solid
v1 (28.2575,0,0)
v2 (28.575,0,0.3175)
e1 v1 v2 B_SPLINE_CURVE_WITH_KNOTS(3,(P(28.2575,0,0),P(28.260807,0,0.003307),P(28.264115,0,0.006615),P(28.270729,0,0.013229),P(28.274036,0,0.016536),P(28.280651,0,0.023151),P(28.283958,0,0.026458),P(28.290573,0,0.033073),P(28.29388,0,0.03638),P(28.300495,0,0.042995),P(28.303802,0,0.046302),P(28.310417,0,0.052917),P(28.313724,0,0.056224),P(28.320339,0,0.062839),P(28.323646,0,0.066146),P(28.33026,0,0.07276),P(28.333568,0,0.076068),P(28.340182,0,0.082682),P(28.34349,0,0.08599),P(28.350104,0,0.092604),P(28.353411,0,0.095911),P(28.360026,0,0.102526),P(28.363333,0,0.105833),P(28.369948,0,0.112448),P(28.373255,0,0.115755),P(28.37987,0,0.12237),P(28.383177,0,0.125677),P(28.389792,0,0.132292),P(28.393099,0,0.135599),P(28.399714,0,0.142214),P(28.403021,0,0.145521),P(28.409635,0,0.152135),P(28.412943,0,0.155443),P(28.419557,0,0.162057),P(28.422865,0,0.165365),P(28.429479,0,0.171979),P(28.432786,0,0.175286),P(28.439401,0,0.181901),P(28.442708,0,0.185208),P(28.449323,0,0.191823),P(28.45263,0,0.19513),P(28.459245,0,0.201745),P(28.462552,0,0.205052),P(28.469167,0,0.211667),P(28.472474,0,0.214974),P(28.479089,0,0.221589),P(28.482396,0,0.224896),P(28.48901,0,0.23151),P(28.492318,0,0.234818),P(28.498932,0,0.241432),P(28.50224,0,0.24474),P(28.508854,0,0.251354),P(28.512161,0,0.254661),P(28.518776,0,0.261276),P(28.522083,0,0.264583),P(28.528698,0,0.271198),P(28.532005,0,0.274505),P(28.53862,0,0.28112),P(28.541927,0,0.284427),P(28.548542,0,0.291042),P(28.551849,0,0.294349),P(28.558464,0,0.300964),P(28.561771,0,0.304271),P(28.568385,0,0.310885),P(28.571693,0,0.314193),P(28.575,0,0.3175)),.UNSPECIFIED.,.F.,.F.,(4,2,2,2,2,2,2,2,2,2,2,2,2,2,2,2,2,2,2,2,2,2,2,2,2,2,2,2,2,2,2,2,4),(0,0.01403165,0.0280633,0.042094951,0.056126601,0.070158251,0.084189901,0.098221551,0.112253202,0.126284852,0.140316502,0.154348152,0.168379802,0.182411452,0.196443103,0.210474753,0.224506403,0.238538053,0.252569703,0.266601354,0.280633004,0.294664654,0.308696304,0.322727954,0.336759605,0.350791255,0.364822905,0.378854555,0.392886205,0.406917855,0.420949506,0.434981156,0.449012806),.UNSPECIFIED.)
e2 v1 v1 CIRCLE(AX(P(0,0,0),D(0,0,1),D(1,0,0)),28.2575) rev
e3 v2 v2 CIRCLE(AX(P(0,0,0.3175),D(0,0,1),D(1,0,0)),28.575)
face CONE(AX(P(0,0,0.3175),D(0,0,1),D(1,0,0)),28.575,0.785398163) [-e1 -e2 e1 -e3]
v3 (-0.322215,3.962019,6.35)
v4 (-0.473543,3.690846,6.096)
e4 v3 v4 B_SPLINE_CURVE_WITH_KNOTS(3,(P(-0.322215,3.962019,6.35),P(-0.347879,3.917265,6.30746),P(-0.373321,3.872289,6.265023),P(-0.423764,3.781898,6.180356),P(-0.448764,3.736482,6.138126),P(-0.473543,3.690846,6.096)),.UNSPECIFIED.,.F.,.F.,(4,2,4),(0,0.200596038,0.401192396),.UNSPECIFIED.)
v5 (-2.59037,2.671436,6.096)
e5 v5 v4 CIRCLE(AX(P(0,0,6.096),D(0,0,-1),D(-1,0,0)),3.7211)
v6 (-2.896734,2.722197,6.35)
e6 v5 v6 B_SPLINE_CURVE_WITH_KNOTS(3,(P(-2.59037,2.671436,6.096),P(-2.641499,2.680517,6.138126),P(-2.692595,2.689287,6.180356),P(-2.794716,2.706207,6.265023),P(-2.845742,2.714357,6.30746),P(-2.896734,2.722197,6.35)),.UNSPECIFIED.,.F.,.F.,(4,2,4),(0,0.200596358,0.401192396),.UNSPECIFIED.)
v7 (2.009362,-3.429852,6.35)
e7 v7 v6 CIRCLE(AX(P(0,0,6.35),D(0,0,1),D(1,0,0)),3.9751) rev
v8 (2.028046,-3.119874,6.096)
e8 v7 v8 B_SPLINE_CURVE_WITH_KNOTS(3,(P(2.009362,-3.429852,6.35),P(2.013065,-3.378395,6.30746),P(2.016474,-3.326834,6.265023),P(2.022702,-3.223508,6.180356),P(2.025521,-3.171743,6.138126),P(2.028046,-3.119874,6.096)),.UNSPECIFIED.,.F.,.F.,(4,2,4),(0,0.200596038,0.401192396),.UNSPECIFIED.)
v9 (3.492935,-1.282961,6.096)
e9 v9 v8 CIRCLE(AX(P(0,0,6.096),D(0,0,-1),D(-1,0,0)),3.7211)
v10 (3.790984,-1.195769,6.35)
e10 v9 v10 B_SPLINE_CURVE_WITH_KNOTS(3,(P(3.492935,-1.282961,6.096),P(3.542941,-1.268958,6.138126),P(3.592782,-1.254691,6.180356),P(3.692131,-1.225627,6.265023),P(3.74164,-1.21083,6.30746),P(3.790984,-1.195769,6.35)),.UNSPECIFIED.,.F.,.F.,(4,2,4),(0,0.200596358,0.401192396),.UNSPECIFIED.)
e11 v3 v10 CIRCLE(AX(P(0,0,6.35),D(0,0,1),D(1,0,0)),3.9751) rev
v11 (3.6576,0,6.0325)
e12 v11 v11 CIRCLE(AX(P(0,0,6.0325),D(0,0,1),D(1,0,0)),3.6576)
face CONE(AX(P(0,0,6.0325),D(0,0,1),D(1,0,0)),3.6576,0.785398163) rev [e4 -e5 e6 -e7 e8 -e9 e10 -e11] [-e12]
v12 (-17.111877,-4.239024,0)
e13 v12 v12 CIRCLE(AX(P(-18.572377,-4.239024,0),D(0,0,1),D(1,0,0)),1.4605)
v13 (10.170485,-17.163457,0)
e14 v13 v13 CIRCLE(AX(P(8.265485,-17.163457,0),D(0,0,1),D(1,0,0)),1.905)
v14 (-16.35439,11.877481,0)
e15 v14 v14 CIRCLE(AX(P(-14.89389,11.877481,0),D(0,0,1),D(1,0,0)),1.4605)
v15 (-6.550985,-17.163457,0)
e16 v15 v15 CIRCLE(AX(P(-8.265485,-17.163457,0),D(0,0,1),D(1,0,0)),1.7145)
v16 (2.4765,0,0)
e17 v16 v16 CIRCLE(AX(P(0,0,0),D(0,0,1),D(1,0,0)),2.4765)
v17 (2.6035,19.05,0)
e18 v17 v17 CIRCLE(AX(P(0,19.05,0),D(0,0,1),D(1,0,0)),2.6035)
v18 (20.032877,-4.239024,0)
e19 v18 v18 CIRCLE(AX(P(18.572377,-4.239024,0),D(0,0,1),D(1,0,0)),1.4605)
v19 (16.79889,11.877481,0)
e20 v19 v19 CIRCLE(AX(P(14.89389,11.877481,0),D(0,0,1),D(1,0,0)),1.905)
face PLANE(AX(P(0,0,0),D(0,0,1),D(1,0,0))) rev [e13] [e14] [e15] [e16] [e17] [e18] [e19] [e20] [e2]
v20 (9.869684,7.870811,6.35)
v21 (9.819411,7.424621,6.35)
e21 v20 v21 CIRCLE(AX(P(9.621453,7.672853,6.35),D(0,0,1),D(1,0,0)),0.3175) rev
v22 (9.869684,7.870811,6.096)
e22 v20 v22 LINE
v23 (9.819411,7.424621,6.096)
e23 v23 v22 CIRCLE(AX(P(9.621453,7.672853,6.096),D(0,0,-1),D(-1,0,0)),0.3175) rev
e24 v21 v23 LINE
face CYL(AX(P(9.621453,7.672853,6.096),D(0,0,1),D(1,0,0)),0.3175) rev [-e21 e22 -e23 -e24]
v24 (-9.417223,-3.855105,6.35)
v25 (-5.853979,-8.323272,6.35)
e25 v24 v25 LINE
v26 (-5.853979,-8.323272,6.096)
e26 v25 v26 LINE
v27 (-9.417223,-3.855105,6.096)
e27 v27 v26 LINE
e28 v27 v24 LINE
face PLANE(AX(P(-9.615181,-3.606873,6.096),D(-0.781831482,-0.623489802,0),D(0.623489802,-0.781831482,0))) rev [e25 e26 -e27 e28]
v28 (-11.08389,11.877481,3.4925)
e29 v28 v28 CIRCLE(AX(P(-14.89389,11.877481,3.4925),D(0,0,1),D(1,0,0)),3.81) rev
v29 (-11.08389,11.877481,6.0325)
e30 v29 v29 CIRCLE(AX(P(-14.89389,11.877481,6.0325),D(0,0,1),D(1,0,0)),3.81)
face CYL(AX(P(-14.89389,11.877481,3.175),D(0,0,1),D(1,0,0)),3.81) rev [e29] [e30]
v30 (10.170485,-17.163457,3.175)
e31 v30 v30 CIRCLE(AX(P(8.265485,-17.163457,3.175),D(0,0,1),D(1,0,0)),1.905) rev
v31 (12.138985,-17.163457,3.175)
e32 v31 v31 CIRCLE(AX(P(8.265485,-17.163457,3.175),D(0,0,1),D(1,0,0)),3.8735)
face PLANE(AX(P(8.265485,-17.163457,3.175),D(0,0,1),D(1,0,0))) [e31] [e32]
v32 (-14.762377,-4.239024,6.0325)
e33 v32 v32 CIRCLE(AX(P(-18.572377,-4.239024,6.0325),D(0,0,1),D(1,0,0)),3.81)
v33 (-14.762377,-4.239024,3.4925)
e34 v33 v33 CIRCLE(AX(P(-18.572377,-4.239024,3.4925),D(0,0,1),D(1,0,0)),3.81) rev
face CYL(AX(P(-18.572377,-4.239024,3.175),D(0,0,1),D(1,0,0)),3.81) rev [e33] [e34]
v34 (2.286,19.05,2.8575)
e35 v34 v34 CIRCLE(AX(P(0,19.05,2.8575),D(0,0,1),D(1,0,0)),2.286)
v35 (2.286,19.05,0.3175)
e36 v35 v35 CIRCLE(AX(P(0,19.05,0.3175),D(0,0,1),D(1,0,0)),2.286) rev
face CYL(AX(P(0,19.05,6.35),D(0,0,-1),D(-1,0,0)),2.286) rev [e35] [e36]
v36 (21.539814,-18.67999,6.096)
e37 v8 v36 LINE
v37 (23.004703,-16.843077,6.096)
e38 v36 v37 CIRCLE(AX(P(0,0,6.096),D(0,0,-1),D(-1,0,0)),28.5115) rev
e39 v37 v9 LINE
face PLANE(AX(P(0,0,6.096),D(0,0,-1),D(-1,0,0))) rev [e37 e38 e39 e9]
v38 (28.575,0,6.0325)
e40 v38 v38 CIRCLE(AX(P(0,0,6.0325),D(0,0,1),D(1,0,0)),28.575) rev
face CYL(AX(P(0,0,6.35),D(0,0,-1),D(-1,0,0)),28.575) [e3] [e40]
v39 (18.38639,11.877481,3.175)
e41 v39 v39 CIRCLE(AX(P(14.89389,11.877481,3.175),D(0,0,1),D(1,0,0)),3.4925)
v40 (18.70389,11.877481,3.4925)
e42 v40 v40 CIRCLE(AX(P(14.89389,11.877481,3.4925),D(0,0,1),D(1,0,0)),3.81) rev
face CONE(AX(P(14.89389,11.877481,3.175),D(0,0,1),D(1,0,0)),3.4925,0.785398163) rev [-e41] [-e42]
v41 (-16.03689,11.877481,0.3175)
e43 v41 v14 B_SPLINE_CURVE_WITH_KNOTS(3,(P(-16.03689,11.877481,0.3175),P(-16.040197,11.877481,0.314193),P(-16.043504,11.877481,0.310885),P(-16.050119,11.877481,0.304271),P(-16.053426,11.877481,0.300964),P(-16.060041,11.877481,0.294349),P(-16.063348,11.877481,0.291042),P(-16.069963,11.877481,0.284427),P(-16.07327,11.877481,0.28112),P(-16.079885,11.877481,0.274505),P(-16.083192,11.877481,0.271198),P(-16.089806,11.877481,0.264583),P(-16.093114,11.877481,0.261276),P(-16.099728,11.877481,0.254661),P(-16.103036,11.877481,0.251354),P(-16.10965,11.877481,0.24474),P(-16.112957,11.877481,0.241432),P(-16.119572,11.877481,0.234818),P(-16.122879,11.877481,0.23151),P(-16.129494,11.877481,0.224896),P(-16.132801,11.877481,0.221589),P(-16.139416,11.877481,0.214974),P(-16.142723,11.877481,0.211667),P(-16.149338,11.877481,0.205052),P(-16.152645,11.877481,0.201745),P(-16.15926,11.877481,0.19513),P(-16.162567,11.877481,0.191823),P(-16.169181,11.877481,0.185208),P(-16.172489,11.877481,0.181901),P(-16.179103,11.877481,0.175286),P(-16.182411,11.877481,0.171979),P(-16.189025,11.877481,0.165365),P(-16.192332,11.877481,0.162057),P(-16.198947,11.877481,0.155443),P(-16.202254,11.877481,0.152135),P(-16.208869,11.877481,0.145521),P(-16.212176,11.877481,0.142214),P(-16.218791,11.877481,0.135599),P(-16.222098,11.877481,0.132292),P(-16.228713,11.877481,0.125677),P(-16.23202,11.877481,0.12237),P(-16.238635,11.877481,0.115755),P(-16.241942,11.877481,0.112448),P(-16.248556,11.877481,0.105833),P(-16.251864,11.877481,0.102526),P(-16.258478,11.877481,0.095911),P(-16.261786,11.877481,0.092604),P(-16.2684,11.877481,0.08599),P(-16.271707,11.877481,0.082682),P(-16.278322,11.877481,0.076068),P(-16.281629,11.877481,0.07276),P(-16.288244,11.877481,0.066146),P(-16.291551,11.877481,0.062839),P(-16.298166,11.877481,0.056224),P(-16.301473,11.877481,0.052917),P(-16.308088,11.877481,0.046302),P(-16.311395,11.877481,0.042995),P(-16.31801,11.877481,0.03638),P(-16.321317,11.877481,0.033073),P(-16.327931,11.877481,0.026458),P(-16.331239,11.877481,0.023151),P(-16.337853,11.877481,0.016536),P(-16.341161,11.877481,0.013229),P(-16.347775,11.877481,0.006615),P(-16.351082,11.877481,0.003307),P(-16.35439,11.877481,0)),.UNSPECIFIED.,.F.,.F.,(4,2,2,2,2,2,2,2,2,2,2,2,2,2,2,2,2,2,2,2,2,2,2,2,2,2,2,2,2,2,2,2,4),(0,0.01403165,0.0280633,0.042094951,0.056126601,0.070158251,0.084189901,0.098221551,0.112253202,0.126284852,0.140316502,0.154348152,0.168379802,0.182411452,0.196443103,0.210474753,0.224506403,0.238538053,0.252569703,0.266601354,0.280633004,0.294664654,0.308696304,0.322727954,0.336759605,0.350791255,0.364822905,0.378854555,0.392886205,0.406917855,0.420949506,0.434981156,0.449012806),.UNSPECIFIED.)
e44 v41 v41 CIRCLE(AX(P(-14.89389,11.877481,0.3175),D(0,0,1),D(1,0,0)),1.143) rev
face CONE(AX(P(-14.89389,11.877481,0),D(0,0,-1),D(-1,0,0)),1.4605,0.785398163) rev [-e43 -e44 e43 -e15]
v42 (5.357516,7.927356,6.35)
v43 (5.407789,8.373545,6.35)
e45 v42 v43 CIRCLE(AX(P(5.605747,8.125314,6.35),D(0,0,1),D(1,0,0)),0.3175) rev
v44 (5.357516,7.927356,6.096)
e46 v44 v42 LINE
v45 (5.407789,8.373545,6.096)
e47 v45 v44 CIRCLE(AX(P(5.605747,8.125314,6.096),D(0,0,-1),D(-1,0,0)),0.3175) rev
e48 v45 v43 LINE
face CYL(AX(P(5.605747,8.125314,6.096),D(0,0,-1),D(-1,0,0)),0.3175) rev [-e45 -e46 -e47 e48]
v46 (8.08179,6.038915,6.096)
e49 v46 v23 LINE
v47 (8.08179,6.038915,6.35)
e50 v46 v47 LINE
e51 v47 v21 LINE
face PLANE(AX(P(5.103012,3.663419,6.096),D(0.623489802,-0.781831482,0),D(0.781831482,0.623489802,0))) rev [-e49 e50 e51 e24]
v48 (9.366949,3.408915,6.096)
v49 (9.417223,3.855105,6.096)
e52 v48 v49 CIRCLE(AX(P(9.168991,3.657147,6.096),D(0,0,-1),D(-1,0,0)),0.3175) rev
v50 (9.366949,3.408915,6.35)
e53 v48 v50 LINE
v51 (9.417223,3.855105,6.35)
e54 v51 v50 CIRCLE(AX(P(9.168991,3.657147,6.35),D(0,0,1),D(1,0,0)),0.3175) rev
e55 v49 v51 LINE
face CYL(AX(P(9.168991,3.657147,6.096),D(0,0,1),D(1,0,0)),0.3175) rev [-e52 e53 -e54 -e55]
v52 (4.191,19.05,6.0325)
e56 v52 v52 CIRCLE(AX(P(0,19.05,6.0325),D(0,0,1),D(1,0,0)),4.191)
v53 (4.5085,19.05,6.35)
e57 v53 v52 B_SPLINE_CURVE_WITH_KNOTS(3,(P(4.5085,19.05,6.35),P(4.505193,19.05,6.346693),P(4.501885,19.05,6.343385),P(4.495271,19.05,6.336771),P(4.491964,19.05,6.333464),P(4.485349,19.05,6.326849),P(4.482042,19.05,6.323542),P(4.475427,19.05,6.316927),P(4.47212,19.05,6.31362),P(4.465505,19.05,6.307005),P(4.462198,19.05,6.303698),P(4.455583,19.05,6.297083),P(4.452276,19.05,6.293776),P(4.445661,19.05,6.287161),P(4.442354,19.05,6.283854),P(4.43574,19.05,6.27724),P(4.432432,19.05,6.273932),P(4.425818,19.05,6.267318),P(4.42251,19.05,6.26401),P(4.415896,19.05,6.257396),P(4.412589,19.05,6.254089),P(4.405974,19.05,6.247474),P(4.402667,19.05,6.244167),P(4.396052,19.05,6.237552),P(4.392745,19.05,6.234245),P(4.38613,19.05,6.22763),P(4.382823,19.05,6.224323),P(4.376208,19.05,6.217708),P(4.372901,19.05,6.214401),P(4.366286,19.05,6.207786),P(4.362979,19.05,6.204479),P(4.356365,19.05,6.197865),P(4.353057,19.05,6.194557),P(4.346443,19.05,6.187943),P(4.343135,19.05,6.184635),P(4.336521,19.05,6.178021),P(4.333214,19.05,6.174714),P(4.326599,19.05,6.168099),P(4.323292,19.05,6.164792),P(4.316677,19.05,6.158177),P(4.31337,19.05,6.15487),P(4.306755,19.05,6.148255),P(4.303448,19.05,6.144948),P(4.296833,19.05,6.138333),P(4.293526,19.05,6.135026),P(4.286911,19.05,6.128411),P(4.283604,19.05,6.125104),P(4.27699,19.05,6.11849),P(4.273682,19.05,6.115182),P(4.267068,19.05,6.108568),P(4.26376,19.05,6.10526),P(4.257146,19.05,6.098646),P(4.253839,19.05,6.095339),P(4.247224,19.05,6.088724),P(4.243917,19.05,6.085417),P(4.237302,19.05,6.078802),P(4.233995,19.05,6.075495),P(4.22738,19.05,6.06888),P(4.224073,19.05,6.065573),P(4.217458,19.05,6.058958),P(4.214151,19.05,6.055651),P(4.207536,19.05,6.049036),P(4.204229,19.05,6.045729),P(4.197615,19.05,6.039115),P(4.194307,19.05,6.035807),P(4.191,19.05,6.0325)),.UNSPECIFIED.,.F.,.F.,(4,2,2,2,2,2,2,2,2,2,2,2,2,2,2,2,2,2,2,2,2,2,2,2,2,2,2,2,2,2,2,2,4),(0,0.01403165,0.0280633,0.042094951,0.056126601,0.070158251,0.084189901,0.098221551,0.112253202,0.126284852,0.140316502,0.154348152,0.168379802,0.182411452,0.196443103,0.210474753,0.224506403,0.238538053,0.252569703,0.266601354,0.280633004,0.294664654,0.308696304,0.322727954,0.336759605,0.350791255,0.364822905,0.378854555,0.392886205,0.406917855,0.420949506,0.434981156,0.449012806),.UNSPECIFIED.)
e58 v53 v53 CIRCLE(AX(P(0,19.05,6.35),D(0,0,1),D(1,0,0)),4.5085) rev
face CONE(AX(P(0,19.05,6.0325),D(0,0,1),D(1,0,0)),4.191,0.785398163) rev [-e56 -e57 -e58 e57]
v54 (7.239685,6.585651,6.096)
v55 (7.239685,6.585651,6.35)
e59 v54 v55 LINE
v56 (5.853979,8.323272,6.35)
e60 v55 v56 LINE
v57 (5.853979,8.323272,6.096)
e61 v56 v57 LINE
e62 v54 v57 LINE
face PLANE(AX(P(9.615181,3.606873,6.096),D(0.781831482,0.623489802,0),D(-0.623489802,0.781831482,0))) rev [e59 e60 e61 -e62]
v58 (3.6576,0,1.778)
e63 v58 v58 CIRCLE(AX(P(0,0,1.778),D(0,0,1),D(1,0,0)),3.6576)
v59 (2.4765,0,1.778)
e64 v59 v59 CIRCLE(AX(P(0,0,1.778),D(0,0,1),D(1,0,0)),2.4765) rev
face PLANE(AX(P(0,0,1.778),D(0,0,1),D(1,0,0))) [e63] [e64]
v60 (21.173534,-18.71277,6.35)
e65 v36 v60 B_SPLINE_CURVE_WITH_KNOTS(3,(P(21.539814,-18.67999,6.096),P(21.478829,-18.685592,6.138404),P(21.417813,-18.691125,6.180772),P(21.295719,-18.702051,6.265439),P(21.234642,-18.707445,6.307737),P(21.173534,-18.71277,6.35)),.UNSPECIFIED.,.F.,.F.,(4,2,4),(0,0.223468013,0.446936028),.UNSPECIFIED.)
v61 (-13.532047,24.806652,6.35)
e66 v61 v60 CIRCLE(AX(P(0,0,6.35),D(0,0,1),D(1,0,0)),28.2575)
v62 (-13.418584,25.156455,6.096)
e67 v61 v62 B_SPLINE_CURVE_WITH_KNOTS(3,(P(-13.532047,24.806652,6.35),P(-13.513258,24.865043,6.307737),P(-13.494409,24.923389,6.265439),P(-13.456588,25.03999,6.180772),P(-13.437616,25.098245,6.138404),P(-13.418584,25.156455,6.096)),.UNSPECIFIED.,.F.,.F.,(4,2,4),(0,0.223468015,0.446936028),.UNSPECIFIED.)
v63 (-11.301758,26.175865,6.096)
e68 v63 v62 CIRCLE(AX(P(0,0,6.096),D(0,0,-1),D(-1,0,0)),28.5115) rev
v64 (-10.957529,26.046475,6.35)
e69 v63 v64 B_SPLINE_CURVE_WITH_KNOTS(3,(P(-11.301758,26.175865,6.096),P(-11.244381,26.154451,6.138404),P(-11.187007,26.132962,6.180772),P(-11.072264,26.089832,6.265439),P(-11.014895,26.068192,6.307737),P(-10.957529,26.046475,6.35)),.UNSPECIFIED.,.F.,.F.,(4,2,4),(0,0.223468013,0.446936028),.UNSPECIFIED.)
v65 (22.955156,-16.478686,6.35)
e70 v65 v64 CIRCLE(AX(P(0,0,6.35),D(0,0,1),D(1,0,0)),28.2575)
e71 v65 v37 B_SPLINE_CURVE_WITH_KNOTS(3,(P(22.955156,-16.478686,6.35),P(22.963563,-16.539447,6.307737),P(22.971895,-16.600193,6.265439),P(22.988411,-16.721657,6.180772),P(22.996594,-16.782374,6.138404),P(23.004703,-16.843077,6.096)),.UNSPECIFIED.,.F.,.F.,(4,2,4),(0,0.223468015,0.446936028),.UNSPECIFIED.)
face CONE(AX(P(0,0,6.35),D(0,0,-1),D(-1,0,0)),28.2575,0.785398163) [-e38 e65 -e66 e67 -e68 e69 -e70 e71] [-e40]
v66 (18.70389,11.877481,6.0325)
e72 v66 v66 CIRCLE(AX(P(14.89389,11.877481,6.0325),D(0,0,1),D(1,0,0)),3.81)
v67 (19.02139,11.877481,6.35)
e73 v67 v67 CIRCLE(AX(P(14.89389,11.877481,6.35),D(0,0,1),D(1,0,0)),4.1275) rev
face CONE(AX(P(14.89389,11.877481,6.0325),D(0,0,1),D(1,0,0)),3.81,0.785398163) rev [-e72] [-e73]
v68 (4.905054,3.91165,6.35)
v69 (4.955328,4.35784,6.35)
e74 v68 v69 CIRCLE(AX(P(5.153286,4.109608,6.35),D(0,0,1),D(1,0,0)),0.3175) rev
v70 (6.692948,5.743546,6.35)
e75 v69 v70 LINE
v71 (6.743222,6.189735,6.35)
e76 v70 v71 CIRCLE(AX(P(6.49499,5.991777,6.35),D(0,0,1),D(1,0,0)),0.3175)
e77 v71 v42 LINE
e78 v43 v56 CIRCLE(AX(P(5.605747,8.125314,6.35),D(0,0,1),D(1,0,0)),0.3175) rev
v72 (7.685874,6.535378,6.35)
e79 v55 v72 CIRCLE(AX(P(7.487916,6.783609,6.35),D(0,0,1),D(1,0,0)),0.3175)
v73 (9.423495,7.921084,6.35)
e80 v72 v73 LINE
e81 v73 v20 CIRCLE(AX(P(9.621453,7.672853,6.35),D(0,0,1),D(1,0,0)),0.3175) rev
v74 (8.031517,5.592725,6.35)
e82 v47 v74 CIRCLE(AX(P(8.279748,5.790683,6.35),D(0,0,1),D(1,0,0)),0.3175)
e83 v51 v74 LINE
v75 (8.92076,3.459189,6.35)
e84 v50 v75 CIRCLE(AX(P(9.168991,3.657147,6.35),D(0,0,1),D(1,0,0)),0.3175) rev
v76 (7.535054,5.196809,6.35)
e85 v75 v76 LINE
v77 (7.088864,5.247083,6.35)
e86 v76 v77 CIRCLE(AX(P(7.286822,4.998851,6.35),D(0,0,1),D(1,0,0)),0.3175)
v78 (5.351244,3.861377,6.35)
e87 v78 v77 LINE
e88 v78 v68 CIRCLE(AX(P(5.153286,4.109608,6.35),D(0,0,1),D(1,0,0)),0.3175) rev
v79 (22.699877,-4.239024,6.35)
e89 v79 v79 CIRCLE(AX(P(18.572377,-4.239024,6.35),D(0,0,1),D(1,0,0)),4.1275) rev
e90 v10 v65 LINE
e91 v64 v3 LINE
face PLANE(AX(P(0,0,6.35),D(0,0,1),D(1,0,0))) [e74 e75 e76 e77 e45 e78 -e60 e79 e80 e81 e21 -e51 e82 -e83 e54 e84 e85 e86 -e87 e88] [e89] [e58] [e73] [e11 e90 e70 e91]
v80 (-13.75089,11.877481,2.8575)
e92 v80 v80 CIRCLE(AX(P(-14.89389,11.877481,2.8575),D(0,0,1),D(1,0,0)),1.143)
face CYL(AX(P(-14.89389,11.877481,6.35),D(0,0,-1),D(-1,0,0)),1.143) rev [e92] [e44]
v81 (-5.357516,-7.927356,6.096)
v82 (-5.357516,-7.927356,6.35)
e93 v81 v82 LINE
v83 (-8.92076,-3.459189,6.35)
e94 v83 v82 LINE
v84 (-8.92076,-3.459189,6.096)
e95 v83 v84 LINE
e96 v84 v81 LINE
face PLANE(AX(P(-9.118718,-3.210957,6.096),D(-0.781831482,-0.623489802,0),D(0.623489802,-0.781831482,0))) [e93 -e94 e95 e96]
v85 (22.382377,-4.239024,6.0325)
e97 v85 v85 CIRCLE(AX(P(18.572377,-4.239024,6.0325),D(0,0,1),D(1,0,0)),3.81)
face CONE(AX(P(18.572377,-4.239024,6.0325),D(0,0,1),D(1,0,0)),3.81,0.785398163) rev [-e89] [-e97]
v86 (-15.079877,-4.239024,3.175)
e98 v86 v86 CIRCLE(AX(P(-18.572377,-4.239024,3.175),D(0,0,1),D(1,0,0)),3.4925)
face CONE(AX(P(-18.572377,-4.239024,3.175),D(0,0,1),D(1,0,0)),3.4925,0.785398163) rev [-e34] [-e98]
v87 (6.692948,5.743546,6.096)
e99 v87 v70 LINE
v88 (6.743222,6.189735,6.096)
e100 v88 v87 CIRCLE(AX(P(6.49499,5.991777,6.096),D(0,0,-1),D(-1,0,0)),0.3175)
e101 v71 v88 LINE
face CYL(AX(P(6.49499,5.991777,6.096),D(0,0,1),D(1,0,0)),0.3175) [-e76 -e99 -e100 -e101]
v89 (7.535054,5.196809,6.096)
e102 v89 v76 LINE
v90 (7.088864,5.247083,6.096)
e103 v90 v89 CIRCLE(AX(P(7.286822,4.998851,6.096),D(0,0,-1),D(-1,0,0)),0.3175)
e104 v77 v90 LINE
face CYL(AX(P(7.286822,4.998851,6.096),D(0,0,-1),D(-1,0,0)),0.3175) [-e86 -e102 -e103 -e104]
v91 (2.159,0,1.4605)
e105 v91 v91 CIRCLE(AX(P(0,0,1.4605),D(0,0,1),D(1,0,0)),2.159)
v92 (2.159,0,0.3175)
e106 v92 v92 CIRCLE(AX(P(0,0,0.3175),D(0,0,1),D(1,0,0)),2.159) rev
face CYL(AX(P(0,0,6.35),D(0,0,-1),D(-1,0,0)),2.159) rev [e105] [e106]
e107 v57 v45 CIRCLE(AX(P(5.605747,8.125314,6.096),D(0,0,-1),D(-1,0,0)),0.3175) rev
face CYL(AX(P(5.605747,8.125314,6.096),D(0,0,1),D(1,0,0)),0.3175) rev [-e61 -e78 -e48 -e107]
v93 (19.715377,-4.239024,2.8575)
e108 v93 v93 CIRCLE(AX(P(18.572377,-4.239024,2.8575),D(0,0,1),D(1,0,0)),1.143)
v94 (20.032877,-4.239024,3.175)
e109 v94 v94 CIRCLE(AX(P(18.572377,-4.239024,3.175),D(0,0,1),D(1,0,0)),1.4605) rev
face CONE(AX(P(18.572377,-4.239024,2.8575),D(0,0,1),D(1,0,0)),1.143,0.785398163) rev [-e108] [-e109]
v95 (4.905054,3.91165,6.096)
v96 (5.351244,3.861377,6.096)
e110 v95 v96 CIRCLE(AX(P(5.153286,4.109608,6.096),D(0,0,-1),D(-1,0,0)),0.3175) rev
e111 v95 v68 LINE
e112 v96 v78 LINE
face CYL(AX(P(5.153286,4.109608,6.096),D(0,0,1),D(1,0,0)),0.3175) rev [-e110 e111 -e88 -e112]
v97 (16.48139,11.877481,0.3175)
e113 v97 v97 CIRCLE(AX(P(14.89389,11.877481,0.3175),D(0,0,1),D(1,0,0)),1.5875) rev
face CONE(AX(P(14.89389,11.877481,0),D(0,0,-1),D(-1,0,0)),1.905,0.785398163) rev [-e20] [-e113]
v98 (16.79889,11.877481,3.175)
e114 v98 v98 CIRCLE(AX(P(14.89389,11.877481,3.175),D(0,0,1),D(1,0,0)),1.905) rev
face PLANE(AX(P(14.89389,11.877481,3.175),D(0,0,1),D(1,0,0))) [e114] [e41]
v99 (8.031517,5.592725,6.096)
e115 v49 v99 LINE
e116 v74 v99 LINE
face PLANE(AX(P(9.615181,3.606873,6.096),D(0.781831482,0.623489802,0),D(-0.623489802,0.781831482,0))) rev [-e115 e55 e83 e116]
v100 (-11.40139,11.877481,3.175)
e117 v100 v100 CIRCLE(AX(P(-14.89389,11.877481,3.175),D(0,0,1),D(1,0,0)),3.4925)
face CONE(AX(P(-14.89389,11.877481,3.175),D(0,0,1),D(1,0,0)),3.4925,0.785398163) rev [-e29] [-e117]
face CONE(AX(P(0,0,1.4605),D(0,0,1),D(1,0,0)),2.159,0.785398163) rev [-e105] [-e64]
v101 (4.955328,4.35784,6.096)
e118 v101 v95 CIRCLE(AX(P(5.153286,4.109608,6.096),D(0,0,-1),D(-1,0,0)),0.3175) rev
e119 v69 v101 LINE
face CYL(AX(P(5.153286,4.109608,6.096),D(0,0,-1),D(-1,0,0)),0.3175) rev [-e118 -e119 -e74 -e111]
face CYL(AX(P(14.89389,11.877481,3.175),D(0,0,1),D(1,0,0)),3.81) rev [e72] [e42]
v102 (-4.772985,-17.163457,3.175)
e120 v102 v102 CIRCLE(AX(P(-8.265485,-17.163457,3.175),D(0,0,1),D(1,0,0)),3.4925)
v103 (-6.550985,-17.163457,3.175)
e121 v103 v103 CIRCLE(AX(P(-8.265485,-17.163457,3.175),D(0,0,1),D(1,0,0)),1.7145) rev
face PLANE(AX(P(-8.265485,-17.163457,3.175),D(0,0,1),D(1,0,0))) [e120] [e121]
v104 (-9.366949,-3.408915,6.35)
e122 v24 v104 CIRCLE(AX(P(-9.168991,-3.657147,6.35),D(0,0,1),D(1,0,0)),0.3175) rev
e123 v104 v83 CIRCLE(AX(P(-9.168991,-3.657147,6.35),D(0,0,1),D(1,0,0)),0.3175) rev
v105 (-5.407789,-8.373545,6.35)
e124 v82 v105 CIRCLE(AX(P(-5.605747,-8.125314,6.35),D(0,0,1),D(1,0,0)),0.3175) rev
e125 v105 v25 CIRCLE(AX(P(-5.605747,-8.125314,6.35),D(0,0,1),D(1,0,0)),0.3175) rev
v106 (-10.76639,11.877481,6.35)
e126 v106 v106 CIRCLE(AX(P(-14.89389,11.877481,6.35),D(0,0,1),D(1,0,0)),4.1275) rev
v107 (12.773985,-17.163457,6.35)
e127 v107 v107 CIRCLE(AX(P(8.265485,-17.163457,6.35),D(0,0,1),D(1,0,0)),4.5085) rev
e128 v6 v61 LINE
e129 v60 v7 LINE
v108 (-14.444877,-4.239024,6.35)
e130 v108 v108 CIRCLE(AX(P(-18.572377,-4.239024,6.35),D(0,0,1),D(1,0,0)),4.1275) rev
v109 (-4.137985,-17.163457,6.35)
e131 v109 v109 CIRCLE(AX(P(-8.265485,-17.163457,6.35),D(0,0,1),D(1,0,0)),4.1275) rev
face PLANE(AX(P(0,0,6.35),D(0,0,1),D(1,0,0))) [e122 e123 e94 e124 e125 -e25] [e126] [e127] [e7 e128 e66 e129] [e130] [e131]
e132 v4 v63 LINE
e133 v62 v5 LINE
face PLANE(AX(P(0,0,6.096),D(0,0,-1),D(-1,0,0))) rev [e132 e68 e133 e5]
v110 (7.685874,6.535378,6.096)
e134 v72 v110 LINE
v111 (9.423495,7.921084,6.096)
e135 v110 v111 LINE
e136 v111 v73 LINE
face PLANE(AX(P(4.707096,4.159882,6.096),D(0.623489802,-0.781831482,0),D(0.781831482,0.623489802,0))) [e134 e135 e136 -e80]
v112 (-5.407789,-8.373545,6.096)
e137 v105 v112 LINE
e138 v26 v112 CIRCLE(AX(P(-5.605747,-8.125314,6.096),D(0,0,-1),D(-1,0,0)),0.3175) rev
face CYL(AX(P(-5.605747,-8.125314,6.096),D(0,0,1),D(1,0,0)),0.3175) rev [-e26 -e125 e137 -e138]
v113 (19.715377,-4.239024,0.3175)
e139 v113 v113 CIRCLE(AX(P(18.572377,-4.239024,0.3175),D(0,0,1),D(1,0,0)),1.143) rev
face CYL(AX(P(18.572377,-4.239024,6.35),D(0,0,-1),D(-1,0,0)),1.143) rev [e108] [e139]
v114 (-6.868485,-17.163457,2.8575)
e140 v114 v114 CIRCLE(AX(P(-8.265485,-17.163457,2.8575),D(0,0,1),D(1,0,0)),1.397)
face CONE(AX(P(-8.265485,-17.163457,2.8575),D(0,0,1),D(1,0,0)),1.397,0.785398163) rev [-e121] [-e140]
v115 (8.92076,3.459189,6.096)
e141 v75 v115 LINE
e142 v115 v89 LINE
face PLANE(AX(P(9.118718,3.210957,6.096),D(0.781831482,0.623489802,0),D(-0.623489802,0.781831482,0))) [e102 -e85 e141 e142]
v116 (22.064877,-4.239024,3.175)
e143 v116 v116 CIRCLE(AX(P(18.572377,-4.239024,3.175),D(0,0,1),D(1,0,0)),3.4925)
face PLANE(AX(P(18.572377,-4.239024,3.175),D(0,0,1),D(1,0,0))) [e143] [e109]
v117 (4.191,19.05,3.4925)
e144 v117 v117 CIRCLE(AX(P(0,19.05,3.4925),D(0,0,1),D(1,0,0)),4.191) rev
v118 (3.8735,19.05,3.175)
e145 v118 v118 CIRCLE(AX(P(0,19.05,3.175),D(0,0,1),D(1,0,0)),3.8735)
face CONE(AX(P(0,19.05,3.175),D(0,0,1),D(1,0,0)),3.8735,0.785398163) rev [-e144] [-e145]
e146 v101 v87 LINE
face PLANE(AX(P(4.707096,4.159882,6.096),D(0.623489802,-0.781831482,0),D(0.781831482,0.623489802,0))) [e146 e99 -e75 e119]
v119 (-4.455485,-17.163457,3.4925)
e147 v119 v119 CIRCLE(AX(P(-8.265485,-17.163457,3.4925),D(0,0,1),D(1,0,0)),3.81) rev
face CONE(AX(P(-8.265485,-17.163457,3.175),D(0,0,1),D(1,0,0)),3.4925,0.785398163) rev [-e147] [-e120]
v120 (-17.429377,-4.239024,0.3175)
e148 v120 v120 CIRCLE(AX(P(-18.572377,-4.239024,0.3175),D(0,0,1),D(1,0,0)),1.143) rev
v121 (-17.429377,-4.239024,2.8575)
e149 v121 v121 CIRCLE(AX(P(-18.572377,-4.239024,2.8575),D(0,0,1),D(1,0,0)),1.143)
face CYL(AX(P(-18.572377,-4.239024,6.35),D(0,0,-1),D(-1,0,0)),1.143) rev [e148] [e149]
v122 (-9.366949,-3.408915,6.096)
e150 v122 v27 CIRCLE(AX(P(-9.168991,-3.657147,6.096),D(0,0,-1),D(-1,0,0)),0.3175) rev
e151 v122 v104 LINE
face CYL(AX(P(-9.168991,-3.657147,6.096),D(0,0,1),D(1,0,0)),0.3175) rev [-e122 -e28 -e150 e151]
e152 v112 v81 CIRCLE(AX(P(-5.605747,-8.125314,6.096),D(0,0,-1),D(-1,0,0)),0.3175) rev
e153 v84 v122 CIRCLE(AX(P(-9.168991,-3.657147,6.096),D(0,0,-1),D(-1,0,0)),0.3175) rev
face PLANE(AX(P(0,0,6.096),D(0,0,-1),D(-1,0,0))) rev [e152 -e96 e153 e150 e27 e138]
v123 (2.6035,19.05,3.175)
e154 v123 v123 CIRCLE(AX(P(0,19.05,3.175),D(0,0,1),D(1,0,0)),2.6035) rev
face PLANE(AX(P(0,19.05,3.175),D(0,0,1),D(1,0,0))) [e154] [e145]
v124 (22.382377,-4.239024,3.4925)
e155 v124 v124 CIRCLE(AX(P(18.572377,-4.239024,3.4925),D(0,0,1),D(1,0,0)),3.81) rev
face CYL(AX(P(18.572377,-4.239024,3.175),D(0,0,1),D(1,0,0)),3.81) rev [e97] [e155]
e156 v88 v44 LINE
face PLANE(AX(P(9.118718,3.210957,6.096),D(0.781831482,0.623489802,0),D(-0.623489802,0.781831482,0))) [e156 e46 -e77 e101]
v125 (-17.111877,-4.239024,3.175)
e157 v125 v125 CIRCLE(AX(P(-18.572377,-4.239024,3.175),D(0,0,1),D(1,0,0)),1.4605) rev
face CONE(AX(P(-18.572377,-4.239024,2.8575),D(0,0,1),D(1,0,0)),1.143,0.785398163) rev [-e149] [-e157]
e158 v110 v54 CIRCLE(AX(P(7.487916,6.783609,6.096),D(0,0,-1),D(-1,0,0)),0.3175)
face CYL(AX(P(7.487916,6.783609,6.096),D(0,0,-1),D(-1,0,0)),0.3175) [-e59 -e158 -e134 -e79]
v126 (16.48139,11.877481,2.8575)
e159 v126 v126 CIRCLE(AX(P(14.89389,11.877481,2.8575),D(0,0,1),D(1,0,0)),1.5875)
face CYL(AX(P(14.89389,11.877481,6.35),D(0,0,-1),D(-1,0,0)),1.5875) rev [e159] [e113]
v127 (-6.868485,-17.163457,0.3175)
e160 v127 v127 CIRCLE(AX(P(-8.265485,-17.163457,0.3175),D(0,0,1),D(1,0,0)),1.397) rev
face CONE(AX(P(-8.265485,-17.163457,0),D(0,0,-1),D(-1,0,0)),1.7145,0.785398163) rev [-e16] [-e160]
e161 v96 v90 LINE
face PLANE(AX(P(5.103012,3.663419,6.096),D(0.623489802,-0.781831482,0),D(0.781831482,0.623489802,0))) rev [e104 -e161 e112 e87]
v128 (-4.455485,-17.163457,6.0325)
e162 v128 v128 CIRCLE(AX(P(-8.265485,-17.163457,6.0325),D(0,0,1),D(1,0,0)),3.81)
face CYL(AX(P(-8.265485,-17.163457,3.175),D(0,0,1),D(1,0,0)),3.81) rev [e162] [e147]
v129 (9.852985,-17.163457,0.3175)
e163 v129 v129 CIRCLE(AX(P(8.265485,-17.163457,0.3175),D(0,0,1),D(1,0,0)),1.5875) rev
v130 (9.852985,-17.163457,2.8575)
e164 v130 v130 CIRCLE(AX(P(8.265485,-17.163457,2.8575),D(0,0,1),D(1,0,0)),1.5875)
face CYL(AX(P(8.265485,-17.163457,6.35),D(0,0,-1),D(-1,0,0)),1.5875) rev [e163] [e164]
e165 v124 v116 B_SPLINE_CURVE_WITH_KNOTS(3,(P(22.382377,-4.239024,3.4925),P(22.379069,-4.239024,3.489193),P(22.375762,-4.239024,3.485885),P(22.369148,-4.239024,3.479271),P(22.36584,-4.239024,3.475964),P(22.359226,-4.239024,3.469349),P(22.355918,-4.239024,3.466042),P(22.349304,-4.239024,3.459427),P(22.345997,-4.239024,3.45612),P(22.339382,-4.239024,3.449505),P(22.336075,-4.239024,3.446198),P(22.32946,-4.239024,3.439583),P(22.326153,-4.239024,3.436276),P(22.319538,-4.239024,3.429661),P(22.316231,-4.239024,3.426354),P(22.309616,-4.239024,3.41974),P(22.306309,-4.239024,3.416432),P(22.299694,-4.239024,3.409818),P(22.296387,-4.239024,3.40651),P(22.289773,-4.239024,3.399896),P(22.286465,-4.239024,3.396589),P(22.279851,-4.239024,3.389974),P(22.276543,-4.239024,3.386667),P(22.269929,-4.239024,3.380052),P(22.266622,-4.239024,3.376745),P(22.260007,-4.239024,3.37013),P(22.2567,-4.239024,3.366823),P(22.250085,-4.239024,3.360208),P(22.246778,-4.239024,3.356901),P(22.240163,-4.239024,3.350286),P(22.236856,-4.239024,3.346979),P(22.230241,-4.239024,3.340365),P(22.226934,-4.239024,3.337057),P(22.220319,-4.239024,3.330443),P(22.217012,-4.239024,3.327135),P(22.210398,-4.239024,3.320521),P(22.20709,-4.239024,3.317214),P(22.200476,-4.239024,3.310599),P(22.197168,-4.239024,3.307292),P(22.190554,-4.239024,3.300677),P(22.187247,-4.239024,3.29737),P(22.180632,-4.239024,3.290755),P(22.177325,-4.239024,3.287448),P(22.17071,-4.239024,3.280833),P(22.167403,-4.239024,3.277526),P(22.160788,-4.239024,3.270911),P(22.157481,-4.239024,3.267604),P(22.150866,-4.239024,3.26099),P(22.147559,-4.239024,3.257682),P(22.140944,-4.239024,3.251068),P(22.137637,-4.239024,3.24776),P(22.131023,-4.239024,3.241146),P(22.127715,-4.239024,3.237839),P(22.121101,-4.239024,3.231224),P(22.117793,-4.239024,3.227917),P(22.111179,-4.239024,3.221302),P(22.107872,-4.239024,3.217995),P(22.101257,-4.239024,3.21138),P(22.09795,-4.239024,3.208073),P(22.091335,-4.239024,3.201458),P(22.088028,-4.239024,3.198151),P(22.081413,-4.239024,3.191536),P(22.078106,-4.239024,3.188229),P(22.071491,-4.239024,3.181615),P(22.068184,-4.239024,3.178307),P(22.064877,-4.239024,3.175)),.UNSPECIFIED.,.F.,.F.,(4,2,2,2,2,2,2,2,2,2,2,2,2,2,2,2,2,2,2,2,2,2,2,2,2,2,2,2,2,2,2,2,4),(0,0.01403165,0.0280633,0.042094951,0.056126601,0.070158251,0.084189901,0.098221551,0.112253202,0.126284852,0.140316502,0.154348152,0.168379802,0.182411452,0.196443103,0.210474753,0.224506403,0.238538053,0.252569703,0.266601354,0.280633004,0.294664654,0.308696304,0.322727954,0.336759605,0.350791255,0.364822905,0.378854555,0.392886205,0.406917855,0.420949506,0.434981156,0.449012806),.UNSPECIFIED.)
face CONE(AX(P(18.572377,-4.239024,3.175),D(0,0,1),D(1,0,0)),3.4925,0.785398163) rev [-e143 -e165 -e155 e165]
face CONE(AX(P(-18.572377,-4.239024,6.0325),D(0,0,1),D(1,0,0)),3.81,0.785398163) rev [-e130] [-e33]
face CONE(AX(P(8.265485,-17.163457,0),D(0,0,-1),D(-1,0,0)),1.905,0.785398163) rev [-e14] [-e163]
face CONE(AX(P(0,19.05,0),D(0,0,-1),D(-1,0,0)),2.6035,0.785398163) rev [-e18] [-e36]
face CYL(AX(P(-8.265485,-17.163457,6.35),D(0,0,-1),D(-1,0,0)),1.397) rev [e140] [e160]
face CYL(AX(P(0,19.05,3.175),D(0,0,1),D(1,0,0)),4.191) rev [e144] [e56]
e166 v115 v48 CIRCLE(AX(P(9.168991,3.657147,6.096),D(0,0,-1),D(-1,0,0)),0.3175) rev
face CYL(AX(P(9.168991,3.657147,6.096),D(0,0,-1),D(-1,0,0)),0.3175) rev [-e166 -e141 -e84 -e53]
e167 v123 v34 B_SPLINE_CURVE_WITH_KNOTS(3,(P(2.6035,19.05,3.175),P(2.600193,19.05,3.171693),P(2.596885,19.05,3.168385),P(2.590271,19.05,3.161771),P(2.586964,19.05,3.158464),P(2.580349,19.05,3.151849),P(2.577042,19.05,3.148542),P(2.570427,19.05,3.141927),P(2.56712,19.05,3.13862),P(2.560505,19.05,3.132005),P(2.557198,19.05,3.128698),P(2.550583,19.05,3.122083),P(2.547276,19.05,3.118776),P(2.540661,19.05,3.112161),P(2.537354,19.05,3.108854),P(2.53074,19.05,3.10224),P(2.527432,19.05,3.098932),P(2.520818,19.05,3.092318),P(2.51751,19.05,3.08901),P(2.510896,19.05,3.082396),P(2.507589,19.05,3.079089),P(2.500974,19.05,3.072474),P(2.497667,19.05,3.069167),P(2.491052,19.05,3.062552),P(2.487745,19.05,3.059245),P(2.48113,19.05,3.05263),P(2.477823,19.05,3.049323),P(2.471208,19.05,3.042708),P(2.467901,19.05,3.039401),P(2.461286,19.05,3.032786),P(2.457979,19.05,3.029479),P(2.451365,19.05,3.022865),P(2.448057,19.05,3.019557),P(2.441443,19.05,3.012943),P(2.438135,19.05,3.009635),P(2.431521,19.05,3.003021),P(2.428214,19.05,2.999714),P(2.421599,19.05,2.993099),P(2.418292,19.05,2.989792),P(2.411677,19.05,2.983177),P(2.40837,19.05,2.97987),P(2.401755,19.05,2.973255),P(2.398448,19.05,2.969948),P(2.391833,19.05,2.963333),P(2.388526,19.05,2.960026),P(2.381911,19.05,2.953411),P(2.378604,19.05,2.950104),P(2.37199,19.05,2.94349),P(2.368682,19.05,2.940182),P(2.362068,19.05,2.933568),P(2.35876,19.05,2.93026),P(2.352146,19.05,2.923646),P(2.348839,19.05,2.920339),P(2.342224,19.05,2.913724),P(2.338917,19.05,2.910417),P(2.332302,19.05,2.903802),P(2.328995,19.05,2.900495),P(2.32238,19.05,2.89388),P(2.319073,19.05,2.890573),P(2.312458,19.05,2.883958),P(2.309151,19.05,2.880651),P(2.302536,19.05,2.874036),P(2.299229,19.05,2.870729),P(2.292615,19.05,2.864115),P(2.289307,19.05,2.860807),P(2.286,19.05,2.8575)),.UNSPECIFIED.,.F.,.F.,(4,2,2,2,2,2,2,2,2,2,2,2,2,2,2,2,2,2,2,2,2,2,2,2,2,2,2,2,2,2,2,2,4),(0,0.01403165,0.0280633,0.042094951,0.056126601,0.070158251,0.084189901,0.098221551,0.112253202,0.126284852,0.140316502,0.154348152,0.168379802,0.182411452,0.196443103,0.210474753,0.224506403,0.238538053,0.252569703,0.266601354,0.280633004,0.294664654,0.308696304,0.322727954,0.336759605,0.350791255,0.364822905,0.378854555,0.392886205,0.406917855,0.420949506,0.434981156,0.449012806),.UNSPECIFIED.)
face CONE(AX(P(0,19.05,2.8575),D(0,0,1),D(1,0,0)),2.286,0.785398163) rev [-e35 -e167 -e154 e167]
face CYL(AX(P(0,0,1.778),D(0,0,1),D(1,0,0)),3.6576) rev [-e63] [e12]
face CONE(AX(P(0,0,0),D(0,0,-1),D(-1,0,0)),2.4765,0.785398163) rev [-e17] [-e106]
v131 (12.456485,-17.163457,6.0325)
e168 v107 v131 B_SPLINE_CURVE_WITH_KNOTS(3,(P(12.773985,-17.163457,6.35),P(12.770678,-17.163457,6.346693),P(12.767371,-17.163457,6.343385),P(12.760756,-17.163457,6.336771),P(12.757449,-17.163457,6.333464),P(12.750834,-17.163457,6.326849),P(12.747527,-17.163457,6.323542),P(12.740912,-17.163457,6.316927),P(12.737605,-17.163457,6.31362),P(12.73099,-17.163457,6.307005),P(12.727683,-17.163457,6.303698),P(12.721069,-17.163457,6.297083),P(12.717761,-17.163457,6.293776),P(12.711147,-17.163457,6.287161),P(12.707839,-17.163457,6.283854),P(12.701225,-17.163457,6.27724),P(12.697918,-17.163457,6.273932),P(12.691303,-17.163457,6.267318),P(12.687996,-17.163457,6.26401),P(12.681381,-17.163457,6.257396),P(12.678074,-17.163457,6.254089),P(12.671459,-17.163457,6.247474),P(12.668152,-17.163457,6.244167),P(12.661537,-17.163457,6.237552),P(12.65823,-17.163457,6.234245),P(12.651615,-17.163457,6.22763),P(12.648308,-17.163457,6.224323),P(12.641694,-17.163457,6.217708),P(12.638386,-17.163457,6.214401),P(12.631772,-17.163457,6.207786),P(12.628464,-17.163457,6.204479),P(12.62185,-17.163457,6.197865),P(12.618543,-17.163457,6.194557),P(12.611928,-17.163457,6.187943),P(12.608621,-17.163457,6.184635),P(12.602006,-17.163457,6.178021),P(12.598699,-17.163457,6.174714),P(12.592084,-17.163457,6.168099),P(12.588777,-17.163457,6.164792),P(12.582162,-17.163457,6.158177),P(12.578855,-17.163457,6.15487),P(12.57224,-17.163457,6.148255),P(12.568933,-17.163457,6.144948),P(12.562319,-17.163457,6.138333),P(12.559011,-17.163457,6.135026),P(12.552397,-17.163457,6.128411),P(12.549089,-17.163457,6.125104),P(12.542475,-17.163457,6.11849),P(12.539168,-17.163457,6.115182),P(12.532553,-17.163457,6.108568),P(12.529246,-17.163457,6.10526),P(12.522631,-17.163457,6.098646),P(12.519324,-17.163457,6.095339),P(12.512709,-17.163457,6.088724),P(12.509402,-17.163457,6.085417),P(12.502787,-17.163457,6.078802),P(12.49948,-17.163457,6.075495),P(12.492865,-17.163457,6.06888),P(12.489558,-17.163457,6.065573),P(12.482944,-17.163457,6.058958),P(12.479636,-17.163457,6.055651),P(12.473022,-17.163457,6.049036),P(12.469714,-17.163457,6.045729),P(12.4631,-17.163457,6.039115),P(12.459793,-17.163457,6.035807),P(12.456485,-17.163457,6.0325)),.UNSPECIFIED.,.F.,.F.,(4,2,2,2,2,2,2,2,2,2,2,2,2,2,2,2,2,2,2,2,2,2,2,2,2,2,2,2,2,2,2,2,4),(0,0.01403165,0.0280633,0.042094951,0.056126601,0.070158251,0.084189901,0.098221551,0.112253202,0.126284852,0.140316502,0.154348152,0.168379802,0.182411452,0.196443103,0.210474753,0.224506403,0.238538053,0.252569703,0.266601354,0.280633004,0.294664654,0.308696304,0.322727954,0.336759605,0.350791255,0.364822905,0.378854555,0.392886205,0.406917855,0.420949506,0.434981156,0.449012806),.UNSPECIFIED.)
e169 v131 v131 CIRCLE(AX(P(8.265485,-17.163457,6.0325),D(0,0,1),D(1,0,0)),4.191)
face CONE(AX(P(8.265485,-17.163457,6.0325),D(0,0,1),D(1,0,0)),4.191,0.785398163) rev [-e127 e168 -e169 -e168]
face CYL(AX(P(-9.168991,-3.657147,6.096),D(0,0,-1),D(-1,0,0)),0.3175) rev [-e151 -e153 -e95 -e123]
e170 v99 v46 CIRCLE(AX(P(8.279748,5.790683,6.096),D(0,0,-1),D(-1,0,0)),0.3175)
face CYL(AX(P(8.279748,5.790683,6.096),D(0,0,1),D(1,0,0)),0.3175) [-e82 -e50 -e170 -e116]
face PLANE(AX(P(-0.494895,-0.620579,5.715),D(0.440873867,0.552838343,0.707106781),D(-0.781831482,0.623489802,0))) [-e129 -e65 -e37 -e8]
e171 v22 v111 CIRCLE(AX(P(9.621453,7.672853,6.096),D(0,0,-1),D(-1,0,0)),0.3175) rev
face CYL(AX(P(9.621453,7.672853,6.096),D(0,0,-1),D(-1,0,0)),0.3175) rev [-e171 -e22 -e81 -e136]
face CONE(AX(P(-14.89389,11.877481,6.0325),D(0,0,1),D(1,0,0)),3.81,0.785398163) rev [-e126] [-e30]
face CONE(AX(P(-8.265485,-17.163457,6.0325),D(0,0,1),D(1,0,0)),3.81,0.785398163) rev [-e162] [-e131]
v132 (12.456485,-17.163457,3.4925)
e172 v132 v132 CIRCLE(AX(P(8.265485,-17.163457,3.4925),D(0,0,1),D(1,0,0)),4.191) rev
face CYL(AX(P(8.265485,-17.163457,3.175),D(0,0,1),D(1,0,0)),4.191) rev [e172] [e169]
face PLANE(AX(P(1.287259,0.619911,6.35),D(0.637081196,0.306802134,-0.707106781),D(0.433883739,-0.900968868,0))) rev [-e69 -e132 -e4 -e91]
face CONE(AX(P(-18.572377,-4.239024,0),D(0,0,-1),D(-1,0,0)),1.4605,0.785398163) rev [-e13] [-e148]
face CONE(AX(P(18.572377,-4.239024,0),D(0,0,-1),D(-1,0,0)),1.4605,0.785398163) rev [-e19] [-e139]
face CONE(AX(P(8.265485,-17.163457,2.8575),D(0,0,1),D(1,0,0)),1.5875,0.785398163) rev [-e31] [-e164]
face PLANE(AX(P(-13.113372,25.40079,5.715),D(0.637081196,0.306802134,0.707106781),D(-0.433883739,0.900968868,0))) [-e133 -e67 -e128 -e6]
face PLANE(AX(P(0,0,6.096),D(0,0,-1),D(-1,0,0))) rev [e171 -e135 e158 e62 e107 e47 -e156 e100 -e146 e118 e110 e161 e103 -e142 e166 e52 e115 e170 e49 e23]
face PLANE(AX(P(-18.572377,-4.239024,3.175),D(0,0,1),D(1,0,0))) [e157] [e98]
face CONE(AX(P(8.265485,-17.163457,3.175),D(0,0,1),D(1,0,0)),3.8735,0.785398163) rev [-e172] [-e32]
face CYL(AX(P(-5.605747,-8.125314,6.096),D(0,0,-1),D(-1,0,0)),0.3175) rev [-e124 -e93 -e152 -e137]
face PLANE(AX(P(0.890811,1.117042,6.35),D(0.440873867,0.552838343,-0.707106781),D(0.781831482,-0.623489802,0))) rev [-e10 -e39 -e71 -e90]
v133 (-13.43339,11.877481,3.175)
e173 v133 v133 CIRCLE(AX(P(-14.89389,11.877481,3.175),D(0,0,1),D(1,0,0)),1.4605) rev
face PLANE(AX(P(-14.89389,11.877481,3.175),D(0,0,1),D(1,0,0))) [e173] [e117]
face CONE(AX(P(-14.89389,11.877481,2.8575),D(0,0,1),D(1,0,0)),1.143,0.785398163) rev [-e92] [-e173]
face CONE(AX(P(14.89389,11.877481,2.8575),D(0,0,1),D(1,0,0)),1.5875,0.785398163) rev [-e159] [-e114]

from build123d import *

# Parameters (mm, degrees)
SKETCH1_R               = 28.575
SKETCH1_R_2             = 2.286
SKETCH1_R_3             = 1.5875
SKETCH1_R_4             = 1.143
SKETCH1_R_5             = 1.397
SKETCH1_R_6             = 2.159
BOSS_EXTRUDE1_DEPTH     = 6.35
SKETCH2_R               = 4.191
SKETCH2_R_2             = 3.81
CUT_EXTRUDE1_DEPTH      = 3.175
SKETCH3_R               = 3.6576
CUT_EXTRUDE2_DEPTH      = 4.572
CHAMFER1_SIZE           = 0.3175
CUT_EXTRUDE_THIN2_DEPTH = 0.254
FILLET1_R               = 0.3175
CUT_EXTRUDE_THIN1_DEPTH = 0.254
CHAMFER2_SIZE           = 0.635


# Some blends are built 0.0001 mm under size
with BuildPart() as part:
    # Sketch1 → Boss-Extrude1 (new body)
    with BuildSketch(Plane.XY):
        Circle(SKETCH1_R)
        with Locations((0, 19.05)):
            Circle(SKETCH1_R_2, mode=Mode.SUBTRACT)
        with Locations((14.893889741, 11.877480725)):
            Circle(SKETCH1_R_3, mode=Mode.SUBTRACT)
        with Locations((18.572376727, -4.239023792)):
            Circle(SKETCH1_R_4, mode=Mode.SUBTRACT)
        with Locations((8.26548523, -17.163456934)):
            Circle(SKETCH1_R_3, mode=Mode.SUBTRACT)
        with Locations((-8.26548523, -17.163456934)):
            Circle(SKETCH1_R_5, mode=Mode.SUBTRACT)
        with Locations((-18.572376727, -4.239023792)):
            Circle(SKETCH1_R_4, mode=Mode.SUBTRACT)
        with Locations((-14.893889741, 11.877480725)):
            Circle(SKETCH1_R_4, mode=Mode.SUBTRACT)
        Circle(SKETCH1_R_6, mode=Mode.SUBTRACT)
    extrude(amount=BOSS_EXTRUDE1_DEPTH)

    # Sketch2 → Cut-Extrude1 (cut)
    with BuildSketch(Plane.XY.offset(6.35)):
        with Locations((0, 19.05)):
            Circle(SKETCH2_R)
        with Locations((14.893889741, 11.877480725)):
            Circle(SKETCH2_R_2)
        with Locations((18.572376727, -4.239023792)):
            Circle(SKETCH2_R_2)
        with Locations((8.26548523, -17.163456934)):
            Circle(SKETCH2_R)
        with Locations((-8.26548523, -17.163456934)):
            Circle(SKETCH2_R_2)
        with Locations((-18.572376727, -4.239023792)):
            Circle(SKETCH2_R_2)
        with Locations((-14.893889741, 11.877480725)):
            Circle(SKETCH2_R_2)
    extrude(amount=-CUT_EXTRUDE1_DEPTH, mode=Mode.SUBTRACT)

    # Sketch3 → Cut-Extrude2 (cut)
    with BuildSketch(Plane.XY.offset(6.35)):
        Circle(SKETCH3_R)
    extrude(amount=-CUT_EXTRUDE2_DEPTH, mode=Mode.SUBTRACT)

    # Chamfer1
    chamfer1_edges = [part.edges().sort_by_distance(p)[0] for p in [
        (17.429376727, -4.239023792, 0),
        (6.67798523, -17.163456934, 0),
        (-28.575, 0, 0),
        (-9.66248523, -17.163456934, 0),
        (-19.715376727, -4.239023792, 0),
        (-16.036889741, 11.877480725, 0),
        (-2.159, 0, 0),
        (-28.575, 0, 6.35),
        (11.083889741, 11.877480725, 3.175),
        (13.306389741, 11.877480725, 3.175),
        (11.083889741, 11.877480725, 6.35),
        (13.306389741, 11.877480725, 0),
        (14.762376727, -4.239023792, 3.175),
        (17.429376727, -4.239023792, 3.175),
        (14.762376727, -4.239023792, 6.35),
        (4.07448523, -17.163456934, 3.175),
        (6.67798523, -17.163456934, 3.175),
        (4.07448523, -17.163456934, 6.35),
        (-12.07548523, -17.163456934, 3.175),
        (-9.66248523, -17.163456934, 3.175),
        (-12.07548523, -17.163456934, 6.35),
        (-22.382376727, -4.239023792, 3.175),
        (-19.715376727, -4.239023792, 3.175),
        (-22.382376727, -4.239023792, 6.35),
        (-18.703889741, 11.877480725, 3.175),
        (-16.036889741, 11.877480725, 3.175),
        (-18.703889741, 11.877480725, 6.35),
        (-4.191, 19.05, 3.175),
        (-2.286, 19.05, 3.175),
        (-4.191, 19.05, 6.35),
        (-2.159, 0, 1.778),
        (-3.6576, 0, 6.35),
        (-2.286, 19.05, 0),
    ]]
    chamfer(chamfer1_edges, length=CHAMFER1_SIZE)

    # Sketch5 → Cut-Extrude-Thin2 (cut)
    with BuildSketch(Plane.XY.offset(6.35)):
        Polygon((5.103012367, 3.663418823), (10.06764228, 7.622579065), (9.671726256, 8.119042056), (4.707096343, 4.159881815), align=None)
        Polygon((9.615180928, 3.606873495), (5.656020686, 8.571503409), (5.159557695, 8.175587385), (9.118717937, 3.210957471), align=None)
        Polygon((-9.615180928, -3.606873495), (-5.656020686, -8.571503409), (-5.159557695, -8.175587385), (-9.118717937, -3.210957471), align=None)
    extrude(amount=-CUT_EXTRUDE_THIN2_DEPTH, mode=Mode.SUBTRACT)

    # Fillet1
    fillet1_edges = [part.edges().sort_by_distance(p)[0] for p in [
        (-5.656020686, -8.571503409, 6.223),
        (-9.615180928, -3.606873495, 6.223),
        (-9.118717937, -3.210957471, 6.223),
        (-5.159557695, -8.175587385, 6.223),
        (10.06764228, 7.622579065, 6.223),
        (9.615180928, 3.606873495, 6.223),
        (9.118717937, 3.210957471, 6.223),
        (5.103012367, 3.663418823, 6.223),
        (4.707096343, 4.159881815, 6.223),
        (5.159557695, 8.175587385, 6.223),
        (9.671726256, 8.119042056, 6.223),
        (5.656020686, 8.571503409, 6.223),
        (7.337095828, 5.445040932, 6.223),
        (7.833558819, 5.840956956, 6.223),
        (7.437642795, 6.337419948, 6.223),
        (6.941179804, 5.941503923, 6.223),
    ]]
    fillet(fillet1_edges, radius=FILLET1_R - 0.0001)  # a hair under: the kernel refuses the full size

    # Sketch4 → Cut-Extrude-Thin1 (cut)
    with BuildSketch(Plane.XY.offset(6.35)):
        Polygon((-13.113371884, 25.400790182), (-0.636538078, -0.507622178), (21.845939581, -18.436799827), (22.835729642, -17.195642349), (0.636538078, 0.507622178), (-11.683083806, 26.089580618), align=None)
    extrude(amount=-CUT_EXTRUDE_THIN1_DEPTH, mode=Mode.SUBTRACT)

    # Chamfer2
    # the kernel refuses this chamfer: 0.635 mm, written as the material it takes off along each edge
    with BuildSketch(Plane(origin=(1.273628889, -2.030929502, 6.35), x_dir=(-0.6232540709086805, -0.7815358852062859, 0.027495876610585914), z_dir=(0.7818314824680229, -0.6234898018587423, 0))) as chamfer2_piece_1_section:
        Polygon((CHAMFER2_SIZE * 0.999621916911, CHAMFER2_SIZE * 0.0274958766106), (-CHAMFER2_SIZE * 0.0274958766106, CHAMFER2_SIZE * 0.999621916911), (0, 0), align=None)
    chamfer2_piece_1 = extrude(amount=27.617341328, mode=Mode.PRIVATE)
    chamfer2_piece_1 = split(chamfer2_piece_1, bisect_by=Plane(origin=(11.905816468, -10.845976149, 6.096), z_dir=(0, 0, 1)), keep=Keep.TOP, mode=Mode.PRIVATE)
    add(chamfer2_piece_1, mode=Mode.SUBTRACT)
    with BuildSketch(Plane(origin=(23.855525862, -18.008902696, 6.35), x_dir=(0.6232540709086805, 0.7815358852062859, 0.027495876610585834), z_dir=(-0.7818314824680228, 0.6234898018587423, 0))) as chamfer2_piece_2_section:
        Polygon((CHAMFER2_SIZE * 0.999621916911, CHAMFER2_SIZE * 0.0274958766106), (-CHAMFER2_SIZE * 0.0274958766106, CHAMFER2_SIZE * 0.999621916911), (0, 0), align=None)
    chamfer2_piece_2 = extrude(amount=27.617341328, mode=Mode.PRIVATE)
    chamfer2_piece_2 = split(chamfer2_piece_2, bisect_by=Plane(origin=(13.223338283, -9.193856049, 6.096), z_dir=(0, 0, 1)), keep=Keep.TOP, mode=Mode.PRIVATE)
    add(chamfer2_piece_2, mode=Mode.SUBTRACT)
    with BuildSketch(Plane(origin=(-0.266312692, 2.382411119, 6.35), x_dir=(0.9006282268100128, 0.4337196950133434, 0.02749587661058592), z_dir=(-0.43388373911756706, 0.9009688679024148, 0))) as chamfer2_piece_3_section:
        Polygon((CHAMFER2_SIZE * 0.999621916911, CHAMFER2_SIZE * 0.0274958766106), (-CHAMFER2_SIZE * 0.0274958766106, CHAMFER2_SIZE * 0.999621916911), (0, 0), align=None)
    chamfer2_piece_3 = extrude(amount=27.617341328, mode=Mode.PRIVATE)
    chamfer2_piece_3 = split(chamfer2_piece_3, bisect_by=Plane(origin=(-6.020877298, 14.937627019, 6.096), z_dir=(0, 0, 1)), keep=Keep.TOP, mode=Mode.PRIVATE)
    add(chamfer2_piece_3, mode=Mode.SUBTRACT)
    with BuildSketch(Plane(origin=(-13.679316089, 26.575985434, 6.35), x_dir=(0.024772928821820563, 0.01193001375411458, -0.999621916911297), z_dir=(0.43388373911756706, -0.9009688679024149, 0))) as chamfer2_piece_4_section:
        Polygon((CHAMFER2_SIZE * 0.999621916911, -CHAMFER2_SIZE * 0.0274958766106), (-CHAMFER2_SIZE * 0.0274958766106, -CHAMFER2_SIZE * 0.999621916911), (0, 0), align=None)
    chamfer2_piece_4 = extrude(amount=27.617341328, mode=Mode.PRIVATE)
    chamfer2_piece_4 = split(chamfer2_piece_4, bisect_by=Plane(origin=(-7.924751483, 14.020769534, 6.096), z_dir=(0, 0, 1)), keep=Keep.TOP, mode=Mode.PRIVATE)
    add(chamfer2_piece_4, mode=Mode.SUBTRACT)


solid = part.part
